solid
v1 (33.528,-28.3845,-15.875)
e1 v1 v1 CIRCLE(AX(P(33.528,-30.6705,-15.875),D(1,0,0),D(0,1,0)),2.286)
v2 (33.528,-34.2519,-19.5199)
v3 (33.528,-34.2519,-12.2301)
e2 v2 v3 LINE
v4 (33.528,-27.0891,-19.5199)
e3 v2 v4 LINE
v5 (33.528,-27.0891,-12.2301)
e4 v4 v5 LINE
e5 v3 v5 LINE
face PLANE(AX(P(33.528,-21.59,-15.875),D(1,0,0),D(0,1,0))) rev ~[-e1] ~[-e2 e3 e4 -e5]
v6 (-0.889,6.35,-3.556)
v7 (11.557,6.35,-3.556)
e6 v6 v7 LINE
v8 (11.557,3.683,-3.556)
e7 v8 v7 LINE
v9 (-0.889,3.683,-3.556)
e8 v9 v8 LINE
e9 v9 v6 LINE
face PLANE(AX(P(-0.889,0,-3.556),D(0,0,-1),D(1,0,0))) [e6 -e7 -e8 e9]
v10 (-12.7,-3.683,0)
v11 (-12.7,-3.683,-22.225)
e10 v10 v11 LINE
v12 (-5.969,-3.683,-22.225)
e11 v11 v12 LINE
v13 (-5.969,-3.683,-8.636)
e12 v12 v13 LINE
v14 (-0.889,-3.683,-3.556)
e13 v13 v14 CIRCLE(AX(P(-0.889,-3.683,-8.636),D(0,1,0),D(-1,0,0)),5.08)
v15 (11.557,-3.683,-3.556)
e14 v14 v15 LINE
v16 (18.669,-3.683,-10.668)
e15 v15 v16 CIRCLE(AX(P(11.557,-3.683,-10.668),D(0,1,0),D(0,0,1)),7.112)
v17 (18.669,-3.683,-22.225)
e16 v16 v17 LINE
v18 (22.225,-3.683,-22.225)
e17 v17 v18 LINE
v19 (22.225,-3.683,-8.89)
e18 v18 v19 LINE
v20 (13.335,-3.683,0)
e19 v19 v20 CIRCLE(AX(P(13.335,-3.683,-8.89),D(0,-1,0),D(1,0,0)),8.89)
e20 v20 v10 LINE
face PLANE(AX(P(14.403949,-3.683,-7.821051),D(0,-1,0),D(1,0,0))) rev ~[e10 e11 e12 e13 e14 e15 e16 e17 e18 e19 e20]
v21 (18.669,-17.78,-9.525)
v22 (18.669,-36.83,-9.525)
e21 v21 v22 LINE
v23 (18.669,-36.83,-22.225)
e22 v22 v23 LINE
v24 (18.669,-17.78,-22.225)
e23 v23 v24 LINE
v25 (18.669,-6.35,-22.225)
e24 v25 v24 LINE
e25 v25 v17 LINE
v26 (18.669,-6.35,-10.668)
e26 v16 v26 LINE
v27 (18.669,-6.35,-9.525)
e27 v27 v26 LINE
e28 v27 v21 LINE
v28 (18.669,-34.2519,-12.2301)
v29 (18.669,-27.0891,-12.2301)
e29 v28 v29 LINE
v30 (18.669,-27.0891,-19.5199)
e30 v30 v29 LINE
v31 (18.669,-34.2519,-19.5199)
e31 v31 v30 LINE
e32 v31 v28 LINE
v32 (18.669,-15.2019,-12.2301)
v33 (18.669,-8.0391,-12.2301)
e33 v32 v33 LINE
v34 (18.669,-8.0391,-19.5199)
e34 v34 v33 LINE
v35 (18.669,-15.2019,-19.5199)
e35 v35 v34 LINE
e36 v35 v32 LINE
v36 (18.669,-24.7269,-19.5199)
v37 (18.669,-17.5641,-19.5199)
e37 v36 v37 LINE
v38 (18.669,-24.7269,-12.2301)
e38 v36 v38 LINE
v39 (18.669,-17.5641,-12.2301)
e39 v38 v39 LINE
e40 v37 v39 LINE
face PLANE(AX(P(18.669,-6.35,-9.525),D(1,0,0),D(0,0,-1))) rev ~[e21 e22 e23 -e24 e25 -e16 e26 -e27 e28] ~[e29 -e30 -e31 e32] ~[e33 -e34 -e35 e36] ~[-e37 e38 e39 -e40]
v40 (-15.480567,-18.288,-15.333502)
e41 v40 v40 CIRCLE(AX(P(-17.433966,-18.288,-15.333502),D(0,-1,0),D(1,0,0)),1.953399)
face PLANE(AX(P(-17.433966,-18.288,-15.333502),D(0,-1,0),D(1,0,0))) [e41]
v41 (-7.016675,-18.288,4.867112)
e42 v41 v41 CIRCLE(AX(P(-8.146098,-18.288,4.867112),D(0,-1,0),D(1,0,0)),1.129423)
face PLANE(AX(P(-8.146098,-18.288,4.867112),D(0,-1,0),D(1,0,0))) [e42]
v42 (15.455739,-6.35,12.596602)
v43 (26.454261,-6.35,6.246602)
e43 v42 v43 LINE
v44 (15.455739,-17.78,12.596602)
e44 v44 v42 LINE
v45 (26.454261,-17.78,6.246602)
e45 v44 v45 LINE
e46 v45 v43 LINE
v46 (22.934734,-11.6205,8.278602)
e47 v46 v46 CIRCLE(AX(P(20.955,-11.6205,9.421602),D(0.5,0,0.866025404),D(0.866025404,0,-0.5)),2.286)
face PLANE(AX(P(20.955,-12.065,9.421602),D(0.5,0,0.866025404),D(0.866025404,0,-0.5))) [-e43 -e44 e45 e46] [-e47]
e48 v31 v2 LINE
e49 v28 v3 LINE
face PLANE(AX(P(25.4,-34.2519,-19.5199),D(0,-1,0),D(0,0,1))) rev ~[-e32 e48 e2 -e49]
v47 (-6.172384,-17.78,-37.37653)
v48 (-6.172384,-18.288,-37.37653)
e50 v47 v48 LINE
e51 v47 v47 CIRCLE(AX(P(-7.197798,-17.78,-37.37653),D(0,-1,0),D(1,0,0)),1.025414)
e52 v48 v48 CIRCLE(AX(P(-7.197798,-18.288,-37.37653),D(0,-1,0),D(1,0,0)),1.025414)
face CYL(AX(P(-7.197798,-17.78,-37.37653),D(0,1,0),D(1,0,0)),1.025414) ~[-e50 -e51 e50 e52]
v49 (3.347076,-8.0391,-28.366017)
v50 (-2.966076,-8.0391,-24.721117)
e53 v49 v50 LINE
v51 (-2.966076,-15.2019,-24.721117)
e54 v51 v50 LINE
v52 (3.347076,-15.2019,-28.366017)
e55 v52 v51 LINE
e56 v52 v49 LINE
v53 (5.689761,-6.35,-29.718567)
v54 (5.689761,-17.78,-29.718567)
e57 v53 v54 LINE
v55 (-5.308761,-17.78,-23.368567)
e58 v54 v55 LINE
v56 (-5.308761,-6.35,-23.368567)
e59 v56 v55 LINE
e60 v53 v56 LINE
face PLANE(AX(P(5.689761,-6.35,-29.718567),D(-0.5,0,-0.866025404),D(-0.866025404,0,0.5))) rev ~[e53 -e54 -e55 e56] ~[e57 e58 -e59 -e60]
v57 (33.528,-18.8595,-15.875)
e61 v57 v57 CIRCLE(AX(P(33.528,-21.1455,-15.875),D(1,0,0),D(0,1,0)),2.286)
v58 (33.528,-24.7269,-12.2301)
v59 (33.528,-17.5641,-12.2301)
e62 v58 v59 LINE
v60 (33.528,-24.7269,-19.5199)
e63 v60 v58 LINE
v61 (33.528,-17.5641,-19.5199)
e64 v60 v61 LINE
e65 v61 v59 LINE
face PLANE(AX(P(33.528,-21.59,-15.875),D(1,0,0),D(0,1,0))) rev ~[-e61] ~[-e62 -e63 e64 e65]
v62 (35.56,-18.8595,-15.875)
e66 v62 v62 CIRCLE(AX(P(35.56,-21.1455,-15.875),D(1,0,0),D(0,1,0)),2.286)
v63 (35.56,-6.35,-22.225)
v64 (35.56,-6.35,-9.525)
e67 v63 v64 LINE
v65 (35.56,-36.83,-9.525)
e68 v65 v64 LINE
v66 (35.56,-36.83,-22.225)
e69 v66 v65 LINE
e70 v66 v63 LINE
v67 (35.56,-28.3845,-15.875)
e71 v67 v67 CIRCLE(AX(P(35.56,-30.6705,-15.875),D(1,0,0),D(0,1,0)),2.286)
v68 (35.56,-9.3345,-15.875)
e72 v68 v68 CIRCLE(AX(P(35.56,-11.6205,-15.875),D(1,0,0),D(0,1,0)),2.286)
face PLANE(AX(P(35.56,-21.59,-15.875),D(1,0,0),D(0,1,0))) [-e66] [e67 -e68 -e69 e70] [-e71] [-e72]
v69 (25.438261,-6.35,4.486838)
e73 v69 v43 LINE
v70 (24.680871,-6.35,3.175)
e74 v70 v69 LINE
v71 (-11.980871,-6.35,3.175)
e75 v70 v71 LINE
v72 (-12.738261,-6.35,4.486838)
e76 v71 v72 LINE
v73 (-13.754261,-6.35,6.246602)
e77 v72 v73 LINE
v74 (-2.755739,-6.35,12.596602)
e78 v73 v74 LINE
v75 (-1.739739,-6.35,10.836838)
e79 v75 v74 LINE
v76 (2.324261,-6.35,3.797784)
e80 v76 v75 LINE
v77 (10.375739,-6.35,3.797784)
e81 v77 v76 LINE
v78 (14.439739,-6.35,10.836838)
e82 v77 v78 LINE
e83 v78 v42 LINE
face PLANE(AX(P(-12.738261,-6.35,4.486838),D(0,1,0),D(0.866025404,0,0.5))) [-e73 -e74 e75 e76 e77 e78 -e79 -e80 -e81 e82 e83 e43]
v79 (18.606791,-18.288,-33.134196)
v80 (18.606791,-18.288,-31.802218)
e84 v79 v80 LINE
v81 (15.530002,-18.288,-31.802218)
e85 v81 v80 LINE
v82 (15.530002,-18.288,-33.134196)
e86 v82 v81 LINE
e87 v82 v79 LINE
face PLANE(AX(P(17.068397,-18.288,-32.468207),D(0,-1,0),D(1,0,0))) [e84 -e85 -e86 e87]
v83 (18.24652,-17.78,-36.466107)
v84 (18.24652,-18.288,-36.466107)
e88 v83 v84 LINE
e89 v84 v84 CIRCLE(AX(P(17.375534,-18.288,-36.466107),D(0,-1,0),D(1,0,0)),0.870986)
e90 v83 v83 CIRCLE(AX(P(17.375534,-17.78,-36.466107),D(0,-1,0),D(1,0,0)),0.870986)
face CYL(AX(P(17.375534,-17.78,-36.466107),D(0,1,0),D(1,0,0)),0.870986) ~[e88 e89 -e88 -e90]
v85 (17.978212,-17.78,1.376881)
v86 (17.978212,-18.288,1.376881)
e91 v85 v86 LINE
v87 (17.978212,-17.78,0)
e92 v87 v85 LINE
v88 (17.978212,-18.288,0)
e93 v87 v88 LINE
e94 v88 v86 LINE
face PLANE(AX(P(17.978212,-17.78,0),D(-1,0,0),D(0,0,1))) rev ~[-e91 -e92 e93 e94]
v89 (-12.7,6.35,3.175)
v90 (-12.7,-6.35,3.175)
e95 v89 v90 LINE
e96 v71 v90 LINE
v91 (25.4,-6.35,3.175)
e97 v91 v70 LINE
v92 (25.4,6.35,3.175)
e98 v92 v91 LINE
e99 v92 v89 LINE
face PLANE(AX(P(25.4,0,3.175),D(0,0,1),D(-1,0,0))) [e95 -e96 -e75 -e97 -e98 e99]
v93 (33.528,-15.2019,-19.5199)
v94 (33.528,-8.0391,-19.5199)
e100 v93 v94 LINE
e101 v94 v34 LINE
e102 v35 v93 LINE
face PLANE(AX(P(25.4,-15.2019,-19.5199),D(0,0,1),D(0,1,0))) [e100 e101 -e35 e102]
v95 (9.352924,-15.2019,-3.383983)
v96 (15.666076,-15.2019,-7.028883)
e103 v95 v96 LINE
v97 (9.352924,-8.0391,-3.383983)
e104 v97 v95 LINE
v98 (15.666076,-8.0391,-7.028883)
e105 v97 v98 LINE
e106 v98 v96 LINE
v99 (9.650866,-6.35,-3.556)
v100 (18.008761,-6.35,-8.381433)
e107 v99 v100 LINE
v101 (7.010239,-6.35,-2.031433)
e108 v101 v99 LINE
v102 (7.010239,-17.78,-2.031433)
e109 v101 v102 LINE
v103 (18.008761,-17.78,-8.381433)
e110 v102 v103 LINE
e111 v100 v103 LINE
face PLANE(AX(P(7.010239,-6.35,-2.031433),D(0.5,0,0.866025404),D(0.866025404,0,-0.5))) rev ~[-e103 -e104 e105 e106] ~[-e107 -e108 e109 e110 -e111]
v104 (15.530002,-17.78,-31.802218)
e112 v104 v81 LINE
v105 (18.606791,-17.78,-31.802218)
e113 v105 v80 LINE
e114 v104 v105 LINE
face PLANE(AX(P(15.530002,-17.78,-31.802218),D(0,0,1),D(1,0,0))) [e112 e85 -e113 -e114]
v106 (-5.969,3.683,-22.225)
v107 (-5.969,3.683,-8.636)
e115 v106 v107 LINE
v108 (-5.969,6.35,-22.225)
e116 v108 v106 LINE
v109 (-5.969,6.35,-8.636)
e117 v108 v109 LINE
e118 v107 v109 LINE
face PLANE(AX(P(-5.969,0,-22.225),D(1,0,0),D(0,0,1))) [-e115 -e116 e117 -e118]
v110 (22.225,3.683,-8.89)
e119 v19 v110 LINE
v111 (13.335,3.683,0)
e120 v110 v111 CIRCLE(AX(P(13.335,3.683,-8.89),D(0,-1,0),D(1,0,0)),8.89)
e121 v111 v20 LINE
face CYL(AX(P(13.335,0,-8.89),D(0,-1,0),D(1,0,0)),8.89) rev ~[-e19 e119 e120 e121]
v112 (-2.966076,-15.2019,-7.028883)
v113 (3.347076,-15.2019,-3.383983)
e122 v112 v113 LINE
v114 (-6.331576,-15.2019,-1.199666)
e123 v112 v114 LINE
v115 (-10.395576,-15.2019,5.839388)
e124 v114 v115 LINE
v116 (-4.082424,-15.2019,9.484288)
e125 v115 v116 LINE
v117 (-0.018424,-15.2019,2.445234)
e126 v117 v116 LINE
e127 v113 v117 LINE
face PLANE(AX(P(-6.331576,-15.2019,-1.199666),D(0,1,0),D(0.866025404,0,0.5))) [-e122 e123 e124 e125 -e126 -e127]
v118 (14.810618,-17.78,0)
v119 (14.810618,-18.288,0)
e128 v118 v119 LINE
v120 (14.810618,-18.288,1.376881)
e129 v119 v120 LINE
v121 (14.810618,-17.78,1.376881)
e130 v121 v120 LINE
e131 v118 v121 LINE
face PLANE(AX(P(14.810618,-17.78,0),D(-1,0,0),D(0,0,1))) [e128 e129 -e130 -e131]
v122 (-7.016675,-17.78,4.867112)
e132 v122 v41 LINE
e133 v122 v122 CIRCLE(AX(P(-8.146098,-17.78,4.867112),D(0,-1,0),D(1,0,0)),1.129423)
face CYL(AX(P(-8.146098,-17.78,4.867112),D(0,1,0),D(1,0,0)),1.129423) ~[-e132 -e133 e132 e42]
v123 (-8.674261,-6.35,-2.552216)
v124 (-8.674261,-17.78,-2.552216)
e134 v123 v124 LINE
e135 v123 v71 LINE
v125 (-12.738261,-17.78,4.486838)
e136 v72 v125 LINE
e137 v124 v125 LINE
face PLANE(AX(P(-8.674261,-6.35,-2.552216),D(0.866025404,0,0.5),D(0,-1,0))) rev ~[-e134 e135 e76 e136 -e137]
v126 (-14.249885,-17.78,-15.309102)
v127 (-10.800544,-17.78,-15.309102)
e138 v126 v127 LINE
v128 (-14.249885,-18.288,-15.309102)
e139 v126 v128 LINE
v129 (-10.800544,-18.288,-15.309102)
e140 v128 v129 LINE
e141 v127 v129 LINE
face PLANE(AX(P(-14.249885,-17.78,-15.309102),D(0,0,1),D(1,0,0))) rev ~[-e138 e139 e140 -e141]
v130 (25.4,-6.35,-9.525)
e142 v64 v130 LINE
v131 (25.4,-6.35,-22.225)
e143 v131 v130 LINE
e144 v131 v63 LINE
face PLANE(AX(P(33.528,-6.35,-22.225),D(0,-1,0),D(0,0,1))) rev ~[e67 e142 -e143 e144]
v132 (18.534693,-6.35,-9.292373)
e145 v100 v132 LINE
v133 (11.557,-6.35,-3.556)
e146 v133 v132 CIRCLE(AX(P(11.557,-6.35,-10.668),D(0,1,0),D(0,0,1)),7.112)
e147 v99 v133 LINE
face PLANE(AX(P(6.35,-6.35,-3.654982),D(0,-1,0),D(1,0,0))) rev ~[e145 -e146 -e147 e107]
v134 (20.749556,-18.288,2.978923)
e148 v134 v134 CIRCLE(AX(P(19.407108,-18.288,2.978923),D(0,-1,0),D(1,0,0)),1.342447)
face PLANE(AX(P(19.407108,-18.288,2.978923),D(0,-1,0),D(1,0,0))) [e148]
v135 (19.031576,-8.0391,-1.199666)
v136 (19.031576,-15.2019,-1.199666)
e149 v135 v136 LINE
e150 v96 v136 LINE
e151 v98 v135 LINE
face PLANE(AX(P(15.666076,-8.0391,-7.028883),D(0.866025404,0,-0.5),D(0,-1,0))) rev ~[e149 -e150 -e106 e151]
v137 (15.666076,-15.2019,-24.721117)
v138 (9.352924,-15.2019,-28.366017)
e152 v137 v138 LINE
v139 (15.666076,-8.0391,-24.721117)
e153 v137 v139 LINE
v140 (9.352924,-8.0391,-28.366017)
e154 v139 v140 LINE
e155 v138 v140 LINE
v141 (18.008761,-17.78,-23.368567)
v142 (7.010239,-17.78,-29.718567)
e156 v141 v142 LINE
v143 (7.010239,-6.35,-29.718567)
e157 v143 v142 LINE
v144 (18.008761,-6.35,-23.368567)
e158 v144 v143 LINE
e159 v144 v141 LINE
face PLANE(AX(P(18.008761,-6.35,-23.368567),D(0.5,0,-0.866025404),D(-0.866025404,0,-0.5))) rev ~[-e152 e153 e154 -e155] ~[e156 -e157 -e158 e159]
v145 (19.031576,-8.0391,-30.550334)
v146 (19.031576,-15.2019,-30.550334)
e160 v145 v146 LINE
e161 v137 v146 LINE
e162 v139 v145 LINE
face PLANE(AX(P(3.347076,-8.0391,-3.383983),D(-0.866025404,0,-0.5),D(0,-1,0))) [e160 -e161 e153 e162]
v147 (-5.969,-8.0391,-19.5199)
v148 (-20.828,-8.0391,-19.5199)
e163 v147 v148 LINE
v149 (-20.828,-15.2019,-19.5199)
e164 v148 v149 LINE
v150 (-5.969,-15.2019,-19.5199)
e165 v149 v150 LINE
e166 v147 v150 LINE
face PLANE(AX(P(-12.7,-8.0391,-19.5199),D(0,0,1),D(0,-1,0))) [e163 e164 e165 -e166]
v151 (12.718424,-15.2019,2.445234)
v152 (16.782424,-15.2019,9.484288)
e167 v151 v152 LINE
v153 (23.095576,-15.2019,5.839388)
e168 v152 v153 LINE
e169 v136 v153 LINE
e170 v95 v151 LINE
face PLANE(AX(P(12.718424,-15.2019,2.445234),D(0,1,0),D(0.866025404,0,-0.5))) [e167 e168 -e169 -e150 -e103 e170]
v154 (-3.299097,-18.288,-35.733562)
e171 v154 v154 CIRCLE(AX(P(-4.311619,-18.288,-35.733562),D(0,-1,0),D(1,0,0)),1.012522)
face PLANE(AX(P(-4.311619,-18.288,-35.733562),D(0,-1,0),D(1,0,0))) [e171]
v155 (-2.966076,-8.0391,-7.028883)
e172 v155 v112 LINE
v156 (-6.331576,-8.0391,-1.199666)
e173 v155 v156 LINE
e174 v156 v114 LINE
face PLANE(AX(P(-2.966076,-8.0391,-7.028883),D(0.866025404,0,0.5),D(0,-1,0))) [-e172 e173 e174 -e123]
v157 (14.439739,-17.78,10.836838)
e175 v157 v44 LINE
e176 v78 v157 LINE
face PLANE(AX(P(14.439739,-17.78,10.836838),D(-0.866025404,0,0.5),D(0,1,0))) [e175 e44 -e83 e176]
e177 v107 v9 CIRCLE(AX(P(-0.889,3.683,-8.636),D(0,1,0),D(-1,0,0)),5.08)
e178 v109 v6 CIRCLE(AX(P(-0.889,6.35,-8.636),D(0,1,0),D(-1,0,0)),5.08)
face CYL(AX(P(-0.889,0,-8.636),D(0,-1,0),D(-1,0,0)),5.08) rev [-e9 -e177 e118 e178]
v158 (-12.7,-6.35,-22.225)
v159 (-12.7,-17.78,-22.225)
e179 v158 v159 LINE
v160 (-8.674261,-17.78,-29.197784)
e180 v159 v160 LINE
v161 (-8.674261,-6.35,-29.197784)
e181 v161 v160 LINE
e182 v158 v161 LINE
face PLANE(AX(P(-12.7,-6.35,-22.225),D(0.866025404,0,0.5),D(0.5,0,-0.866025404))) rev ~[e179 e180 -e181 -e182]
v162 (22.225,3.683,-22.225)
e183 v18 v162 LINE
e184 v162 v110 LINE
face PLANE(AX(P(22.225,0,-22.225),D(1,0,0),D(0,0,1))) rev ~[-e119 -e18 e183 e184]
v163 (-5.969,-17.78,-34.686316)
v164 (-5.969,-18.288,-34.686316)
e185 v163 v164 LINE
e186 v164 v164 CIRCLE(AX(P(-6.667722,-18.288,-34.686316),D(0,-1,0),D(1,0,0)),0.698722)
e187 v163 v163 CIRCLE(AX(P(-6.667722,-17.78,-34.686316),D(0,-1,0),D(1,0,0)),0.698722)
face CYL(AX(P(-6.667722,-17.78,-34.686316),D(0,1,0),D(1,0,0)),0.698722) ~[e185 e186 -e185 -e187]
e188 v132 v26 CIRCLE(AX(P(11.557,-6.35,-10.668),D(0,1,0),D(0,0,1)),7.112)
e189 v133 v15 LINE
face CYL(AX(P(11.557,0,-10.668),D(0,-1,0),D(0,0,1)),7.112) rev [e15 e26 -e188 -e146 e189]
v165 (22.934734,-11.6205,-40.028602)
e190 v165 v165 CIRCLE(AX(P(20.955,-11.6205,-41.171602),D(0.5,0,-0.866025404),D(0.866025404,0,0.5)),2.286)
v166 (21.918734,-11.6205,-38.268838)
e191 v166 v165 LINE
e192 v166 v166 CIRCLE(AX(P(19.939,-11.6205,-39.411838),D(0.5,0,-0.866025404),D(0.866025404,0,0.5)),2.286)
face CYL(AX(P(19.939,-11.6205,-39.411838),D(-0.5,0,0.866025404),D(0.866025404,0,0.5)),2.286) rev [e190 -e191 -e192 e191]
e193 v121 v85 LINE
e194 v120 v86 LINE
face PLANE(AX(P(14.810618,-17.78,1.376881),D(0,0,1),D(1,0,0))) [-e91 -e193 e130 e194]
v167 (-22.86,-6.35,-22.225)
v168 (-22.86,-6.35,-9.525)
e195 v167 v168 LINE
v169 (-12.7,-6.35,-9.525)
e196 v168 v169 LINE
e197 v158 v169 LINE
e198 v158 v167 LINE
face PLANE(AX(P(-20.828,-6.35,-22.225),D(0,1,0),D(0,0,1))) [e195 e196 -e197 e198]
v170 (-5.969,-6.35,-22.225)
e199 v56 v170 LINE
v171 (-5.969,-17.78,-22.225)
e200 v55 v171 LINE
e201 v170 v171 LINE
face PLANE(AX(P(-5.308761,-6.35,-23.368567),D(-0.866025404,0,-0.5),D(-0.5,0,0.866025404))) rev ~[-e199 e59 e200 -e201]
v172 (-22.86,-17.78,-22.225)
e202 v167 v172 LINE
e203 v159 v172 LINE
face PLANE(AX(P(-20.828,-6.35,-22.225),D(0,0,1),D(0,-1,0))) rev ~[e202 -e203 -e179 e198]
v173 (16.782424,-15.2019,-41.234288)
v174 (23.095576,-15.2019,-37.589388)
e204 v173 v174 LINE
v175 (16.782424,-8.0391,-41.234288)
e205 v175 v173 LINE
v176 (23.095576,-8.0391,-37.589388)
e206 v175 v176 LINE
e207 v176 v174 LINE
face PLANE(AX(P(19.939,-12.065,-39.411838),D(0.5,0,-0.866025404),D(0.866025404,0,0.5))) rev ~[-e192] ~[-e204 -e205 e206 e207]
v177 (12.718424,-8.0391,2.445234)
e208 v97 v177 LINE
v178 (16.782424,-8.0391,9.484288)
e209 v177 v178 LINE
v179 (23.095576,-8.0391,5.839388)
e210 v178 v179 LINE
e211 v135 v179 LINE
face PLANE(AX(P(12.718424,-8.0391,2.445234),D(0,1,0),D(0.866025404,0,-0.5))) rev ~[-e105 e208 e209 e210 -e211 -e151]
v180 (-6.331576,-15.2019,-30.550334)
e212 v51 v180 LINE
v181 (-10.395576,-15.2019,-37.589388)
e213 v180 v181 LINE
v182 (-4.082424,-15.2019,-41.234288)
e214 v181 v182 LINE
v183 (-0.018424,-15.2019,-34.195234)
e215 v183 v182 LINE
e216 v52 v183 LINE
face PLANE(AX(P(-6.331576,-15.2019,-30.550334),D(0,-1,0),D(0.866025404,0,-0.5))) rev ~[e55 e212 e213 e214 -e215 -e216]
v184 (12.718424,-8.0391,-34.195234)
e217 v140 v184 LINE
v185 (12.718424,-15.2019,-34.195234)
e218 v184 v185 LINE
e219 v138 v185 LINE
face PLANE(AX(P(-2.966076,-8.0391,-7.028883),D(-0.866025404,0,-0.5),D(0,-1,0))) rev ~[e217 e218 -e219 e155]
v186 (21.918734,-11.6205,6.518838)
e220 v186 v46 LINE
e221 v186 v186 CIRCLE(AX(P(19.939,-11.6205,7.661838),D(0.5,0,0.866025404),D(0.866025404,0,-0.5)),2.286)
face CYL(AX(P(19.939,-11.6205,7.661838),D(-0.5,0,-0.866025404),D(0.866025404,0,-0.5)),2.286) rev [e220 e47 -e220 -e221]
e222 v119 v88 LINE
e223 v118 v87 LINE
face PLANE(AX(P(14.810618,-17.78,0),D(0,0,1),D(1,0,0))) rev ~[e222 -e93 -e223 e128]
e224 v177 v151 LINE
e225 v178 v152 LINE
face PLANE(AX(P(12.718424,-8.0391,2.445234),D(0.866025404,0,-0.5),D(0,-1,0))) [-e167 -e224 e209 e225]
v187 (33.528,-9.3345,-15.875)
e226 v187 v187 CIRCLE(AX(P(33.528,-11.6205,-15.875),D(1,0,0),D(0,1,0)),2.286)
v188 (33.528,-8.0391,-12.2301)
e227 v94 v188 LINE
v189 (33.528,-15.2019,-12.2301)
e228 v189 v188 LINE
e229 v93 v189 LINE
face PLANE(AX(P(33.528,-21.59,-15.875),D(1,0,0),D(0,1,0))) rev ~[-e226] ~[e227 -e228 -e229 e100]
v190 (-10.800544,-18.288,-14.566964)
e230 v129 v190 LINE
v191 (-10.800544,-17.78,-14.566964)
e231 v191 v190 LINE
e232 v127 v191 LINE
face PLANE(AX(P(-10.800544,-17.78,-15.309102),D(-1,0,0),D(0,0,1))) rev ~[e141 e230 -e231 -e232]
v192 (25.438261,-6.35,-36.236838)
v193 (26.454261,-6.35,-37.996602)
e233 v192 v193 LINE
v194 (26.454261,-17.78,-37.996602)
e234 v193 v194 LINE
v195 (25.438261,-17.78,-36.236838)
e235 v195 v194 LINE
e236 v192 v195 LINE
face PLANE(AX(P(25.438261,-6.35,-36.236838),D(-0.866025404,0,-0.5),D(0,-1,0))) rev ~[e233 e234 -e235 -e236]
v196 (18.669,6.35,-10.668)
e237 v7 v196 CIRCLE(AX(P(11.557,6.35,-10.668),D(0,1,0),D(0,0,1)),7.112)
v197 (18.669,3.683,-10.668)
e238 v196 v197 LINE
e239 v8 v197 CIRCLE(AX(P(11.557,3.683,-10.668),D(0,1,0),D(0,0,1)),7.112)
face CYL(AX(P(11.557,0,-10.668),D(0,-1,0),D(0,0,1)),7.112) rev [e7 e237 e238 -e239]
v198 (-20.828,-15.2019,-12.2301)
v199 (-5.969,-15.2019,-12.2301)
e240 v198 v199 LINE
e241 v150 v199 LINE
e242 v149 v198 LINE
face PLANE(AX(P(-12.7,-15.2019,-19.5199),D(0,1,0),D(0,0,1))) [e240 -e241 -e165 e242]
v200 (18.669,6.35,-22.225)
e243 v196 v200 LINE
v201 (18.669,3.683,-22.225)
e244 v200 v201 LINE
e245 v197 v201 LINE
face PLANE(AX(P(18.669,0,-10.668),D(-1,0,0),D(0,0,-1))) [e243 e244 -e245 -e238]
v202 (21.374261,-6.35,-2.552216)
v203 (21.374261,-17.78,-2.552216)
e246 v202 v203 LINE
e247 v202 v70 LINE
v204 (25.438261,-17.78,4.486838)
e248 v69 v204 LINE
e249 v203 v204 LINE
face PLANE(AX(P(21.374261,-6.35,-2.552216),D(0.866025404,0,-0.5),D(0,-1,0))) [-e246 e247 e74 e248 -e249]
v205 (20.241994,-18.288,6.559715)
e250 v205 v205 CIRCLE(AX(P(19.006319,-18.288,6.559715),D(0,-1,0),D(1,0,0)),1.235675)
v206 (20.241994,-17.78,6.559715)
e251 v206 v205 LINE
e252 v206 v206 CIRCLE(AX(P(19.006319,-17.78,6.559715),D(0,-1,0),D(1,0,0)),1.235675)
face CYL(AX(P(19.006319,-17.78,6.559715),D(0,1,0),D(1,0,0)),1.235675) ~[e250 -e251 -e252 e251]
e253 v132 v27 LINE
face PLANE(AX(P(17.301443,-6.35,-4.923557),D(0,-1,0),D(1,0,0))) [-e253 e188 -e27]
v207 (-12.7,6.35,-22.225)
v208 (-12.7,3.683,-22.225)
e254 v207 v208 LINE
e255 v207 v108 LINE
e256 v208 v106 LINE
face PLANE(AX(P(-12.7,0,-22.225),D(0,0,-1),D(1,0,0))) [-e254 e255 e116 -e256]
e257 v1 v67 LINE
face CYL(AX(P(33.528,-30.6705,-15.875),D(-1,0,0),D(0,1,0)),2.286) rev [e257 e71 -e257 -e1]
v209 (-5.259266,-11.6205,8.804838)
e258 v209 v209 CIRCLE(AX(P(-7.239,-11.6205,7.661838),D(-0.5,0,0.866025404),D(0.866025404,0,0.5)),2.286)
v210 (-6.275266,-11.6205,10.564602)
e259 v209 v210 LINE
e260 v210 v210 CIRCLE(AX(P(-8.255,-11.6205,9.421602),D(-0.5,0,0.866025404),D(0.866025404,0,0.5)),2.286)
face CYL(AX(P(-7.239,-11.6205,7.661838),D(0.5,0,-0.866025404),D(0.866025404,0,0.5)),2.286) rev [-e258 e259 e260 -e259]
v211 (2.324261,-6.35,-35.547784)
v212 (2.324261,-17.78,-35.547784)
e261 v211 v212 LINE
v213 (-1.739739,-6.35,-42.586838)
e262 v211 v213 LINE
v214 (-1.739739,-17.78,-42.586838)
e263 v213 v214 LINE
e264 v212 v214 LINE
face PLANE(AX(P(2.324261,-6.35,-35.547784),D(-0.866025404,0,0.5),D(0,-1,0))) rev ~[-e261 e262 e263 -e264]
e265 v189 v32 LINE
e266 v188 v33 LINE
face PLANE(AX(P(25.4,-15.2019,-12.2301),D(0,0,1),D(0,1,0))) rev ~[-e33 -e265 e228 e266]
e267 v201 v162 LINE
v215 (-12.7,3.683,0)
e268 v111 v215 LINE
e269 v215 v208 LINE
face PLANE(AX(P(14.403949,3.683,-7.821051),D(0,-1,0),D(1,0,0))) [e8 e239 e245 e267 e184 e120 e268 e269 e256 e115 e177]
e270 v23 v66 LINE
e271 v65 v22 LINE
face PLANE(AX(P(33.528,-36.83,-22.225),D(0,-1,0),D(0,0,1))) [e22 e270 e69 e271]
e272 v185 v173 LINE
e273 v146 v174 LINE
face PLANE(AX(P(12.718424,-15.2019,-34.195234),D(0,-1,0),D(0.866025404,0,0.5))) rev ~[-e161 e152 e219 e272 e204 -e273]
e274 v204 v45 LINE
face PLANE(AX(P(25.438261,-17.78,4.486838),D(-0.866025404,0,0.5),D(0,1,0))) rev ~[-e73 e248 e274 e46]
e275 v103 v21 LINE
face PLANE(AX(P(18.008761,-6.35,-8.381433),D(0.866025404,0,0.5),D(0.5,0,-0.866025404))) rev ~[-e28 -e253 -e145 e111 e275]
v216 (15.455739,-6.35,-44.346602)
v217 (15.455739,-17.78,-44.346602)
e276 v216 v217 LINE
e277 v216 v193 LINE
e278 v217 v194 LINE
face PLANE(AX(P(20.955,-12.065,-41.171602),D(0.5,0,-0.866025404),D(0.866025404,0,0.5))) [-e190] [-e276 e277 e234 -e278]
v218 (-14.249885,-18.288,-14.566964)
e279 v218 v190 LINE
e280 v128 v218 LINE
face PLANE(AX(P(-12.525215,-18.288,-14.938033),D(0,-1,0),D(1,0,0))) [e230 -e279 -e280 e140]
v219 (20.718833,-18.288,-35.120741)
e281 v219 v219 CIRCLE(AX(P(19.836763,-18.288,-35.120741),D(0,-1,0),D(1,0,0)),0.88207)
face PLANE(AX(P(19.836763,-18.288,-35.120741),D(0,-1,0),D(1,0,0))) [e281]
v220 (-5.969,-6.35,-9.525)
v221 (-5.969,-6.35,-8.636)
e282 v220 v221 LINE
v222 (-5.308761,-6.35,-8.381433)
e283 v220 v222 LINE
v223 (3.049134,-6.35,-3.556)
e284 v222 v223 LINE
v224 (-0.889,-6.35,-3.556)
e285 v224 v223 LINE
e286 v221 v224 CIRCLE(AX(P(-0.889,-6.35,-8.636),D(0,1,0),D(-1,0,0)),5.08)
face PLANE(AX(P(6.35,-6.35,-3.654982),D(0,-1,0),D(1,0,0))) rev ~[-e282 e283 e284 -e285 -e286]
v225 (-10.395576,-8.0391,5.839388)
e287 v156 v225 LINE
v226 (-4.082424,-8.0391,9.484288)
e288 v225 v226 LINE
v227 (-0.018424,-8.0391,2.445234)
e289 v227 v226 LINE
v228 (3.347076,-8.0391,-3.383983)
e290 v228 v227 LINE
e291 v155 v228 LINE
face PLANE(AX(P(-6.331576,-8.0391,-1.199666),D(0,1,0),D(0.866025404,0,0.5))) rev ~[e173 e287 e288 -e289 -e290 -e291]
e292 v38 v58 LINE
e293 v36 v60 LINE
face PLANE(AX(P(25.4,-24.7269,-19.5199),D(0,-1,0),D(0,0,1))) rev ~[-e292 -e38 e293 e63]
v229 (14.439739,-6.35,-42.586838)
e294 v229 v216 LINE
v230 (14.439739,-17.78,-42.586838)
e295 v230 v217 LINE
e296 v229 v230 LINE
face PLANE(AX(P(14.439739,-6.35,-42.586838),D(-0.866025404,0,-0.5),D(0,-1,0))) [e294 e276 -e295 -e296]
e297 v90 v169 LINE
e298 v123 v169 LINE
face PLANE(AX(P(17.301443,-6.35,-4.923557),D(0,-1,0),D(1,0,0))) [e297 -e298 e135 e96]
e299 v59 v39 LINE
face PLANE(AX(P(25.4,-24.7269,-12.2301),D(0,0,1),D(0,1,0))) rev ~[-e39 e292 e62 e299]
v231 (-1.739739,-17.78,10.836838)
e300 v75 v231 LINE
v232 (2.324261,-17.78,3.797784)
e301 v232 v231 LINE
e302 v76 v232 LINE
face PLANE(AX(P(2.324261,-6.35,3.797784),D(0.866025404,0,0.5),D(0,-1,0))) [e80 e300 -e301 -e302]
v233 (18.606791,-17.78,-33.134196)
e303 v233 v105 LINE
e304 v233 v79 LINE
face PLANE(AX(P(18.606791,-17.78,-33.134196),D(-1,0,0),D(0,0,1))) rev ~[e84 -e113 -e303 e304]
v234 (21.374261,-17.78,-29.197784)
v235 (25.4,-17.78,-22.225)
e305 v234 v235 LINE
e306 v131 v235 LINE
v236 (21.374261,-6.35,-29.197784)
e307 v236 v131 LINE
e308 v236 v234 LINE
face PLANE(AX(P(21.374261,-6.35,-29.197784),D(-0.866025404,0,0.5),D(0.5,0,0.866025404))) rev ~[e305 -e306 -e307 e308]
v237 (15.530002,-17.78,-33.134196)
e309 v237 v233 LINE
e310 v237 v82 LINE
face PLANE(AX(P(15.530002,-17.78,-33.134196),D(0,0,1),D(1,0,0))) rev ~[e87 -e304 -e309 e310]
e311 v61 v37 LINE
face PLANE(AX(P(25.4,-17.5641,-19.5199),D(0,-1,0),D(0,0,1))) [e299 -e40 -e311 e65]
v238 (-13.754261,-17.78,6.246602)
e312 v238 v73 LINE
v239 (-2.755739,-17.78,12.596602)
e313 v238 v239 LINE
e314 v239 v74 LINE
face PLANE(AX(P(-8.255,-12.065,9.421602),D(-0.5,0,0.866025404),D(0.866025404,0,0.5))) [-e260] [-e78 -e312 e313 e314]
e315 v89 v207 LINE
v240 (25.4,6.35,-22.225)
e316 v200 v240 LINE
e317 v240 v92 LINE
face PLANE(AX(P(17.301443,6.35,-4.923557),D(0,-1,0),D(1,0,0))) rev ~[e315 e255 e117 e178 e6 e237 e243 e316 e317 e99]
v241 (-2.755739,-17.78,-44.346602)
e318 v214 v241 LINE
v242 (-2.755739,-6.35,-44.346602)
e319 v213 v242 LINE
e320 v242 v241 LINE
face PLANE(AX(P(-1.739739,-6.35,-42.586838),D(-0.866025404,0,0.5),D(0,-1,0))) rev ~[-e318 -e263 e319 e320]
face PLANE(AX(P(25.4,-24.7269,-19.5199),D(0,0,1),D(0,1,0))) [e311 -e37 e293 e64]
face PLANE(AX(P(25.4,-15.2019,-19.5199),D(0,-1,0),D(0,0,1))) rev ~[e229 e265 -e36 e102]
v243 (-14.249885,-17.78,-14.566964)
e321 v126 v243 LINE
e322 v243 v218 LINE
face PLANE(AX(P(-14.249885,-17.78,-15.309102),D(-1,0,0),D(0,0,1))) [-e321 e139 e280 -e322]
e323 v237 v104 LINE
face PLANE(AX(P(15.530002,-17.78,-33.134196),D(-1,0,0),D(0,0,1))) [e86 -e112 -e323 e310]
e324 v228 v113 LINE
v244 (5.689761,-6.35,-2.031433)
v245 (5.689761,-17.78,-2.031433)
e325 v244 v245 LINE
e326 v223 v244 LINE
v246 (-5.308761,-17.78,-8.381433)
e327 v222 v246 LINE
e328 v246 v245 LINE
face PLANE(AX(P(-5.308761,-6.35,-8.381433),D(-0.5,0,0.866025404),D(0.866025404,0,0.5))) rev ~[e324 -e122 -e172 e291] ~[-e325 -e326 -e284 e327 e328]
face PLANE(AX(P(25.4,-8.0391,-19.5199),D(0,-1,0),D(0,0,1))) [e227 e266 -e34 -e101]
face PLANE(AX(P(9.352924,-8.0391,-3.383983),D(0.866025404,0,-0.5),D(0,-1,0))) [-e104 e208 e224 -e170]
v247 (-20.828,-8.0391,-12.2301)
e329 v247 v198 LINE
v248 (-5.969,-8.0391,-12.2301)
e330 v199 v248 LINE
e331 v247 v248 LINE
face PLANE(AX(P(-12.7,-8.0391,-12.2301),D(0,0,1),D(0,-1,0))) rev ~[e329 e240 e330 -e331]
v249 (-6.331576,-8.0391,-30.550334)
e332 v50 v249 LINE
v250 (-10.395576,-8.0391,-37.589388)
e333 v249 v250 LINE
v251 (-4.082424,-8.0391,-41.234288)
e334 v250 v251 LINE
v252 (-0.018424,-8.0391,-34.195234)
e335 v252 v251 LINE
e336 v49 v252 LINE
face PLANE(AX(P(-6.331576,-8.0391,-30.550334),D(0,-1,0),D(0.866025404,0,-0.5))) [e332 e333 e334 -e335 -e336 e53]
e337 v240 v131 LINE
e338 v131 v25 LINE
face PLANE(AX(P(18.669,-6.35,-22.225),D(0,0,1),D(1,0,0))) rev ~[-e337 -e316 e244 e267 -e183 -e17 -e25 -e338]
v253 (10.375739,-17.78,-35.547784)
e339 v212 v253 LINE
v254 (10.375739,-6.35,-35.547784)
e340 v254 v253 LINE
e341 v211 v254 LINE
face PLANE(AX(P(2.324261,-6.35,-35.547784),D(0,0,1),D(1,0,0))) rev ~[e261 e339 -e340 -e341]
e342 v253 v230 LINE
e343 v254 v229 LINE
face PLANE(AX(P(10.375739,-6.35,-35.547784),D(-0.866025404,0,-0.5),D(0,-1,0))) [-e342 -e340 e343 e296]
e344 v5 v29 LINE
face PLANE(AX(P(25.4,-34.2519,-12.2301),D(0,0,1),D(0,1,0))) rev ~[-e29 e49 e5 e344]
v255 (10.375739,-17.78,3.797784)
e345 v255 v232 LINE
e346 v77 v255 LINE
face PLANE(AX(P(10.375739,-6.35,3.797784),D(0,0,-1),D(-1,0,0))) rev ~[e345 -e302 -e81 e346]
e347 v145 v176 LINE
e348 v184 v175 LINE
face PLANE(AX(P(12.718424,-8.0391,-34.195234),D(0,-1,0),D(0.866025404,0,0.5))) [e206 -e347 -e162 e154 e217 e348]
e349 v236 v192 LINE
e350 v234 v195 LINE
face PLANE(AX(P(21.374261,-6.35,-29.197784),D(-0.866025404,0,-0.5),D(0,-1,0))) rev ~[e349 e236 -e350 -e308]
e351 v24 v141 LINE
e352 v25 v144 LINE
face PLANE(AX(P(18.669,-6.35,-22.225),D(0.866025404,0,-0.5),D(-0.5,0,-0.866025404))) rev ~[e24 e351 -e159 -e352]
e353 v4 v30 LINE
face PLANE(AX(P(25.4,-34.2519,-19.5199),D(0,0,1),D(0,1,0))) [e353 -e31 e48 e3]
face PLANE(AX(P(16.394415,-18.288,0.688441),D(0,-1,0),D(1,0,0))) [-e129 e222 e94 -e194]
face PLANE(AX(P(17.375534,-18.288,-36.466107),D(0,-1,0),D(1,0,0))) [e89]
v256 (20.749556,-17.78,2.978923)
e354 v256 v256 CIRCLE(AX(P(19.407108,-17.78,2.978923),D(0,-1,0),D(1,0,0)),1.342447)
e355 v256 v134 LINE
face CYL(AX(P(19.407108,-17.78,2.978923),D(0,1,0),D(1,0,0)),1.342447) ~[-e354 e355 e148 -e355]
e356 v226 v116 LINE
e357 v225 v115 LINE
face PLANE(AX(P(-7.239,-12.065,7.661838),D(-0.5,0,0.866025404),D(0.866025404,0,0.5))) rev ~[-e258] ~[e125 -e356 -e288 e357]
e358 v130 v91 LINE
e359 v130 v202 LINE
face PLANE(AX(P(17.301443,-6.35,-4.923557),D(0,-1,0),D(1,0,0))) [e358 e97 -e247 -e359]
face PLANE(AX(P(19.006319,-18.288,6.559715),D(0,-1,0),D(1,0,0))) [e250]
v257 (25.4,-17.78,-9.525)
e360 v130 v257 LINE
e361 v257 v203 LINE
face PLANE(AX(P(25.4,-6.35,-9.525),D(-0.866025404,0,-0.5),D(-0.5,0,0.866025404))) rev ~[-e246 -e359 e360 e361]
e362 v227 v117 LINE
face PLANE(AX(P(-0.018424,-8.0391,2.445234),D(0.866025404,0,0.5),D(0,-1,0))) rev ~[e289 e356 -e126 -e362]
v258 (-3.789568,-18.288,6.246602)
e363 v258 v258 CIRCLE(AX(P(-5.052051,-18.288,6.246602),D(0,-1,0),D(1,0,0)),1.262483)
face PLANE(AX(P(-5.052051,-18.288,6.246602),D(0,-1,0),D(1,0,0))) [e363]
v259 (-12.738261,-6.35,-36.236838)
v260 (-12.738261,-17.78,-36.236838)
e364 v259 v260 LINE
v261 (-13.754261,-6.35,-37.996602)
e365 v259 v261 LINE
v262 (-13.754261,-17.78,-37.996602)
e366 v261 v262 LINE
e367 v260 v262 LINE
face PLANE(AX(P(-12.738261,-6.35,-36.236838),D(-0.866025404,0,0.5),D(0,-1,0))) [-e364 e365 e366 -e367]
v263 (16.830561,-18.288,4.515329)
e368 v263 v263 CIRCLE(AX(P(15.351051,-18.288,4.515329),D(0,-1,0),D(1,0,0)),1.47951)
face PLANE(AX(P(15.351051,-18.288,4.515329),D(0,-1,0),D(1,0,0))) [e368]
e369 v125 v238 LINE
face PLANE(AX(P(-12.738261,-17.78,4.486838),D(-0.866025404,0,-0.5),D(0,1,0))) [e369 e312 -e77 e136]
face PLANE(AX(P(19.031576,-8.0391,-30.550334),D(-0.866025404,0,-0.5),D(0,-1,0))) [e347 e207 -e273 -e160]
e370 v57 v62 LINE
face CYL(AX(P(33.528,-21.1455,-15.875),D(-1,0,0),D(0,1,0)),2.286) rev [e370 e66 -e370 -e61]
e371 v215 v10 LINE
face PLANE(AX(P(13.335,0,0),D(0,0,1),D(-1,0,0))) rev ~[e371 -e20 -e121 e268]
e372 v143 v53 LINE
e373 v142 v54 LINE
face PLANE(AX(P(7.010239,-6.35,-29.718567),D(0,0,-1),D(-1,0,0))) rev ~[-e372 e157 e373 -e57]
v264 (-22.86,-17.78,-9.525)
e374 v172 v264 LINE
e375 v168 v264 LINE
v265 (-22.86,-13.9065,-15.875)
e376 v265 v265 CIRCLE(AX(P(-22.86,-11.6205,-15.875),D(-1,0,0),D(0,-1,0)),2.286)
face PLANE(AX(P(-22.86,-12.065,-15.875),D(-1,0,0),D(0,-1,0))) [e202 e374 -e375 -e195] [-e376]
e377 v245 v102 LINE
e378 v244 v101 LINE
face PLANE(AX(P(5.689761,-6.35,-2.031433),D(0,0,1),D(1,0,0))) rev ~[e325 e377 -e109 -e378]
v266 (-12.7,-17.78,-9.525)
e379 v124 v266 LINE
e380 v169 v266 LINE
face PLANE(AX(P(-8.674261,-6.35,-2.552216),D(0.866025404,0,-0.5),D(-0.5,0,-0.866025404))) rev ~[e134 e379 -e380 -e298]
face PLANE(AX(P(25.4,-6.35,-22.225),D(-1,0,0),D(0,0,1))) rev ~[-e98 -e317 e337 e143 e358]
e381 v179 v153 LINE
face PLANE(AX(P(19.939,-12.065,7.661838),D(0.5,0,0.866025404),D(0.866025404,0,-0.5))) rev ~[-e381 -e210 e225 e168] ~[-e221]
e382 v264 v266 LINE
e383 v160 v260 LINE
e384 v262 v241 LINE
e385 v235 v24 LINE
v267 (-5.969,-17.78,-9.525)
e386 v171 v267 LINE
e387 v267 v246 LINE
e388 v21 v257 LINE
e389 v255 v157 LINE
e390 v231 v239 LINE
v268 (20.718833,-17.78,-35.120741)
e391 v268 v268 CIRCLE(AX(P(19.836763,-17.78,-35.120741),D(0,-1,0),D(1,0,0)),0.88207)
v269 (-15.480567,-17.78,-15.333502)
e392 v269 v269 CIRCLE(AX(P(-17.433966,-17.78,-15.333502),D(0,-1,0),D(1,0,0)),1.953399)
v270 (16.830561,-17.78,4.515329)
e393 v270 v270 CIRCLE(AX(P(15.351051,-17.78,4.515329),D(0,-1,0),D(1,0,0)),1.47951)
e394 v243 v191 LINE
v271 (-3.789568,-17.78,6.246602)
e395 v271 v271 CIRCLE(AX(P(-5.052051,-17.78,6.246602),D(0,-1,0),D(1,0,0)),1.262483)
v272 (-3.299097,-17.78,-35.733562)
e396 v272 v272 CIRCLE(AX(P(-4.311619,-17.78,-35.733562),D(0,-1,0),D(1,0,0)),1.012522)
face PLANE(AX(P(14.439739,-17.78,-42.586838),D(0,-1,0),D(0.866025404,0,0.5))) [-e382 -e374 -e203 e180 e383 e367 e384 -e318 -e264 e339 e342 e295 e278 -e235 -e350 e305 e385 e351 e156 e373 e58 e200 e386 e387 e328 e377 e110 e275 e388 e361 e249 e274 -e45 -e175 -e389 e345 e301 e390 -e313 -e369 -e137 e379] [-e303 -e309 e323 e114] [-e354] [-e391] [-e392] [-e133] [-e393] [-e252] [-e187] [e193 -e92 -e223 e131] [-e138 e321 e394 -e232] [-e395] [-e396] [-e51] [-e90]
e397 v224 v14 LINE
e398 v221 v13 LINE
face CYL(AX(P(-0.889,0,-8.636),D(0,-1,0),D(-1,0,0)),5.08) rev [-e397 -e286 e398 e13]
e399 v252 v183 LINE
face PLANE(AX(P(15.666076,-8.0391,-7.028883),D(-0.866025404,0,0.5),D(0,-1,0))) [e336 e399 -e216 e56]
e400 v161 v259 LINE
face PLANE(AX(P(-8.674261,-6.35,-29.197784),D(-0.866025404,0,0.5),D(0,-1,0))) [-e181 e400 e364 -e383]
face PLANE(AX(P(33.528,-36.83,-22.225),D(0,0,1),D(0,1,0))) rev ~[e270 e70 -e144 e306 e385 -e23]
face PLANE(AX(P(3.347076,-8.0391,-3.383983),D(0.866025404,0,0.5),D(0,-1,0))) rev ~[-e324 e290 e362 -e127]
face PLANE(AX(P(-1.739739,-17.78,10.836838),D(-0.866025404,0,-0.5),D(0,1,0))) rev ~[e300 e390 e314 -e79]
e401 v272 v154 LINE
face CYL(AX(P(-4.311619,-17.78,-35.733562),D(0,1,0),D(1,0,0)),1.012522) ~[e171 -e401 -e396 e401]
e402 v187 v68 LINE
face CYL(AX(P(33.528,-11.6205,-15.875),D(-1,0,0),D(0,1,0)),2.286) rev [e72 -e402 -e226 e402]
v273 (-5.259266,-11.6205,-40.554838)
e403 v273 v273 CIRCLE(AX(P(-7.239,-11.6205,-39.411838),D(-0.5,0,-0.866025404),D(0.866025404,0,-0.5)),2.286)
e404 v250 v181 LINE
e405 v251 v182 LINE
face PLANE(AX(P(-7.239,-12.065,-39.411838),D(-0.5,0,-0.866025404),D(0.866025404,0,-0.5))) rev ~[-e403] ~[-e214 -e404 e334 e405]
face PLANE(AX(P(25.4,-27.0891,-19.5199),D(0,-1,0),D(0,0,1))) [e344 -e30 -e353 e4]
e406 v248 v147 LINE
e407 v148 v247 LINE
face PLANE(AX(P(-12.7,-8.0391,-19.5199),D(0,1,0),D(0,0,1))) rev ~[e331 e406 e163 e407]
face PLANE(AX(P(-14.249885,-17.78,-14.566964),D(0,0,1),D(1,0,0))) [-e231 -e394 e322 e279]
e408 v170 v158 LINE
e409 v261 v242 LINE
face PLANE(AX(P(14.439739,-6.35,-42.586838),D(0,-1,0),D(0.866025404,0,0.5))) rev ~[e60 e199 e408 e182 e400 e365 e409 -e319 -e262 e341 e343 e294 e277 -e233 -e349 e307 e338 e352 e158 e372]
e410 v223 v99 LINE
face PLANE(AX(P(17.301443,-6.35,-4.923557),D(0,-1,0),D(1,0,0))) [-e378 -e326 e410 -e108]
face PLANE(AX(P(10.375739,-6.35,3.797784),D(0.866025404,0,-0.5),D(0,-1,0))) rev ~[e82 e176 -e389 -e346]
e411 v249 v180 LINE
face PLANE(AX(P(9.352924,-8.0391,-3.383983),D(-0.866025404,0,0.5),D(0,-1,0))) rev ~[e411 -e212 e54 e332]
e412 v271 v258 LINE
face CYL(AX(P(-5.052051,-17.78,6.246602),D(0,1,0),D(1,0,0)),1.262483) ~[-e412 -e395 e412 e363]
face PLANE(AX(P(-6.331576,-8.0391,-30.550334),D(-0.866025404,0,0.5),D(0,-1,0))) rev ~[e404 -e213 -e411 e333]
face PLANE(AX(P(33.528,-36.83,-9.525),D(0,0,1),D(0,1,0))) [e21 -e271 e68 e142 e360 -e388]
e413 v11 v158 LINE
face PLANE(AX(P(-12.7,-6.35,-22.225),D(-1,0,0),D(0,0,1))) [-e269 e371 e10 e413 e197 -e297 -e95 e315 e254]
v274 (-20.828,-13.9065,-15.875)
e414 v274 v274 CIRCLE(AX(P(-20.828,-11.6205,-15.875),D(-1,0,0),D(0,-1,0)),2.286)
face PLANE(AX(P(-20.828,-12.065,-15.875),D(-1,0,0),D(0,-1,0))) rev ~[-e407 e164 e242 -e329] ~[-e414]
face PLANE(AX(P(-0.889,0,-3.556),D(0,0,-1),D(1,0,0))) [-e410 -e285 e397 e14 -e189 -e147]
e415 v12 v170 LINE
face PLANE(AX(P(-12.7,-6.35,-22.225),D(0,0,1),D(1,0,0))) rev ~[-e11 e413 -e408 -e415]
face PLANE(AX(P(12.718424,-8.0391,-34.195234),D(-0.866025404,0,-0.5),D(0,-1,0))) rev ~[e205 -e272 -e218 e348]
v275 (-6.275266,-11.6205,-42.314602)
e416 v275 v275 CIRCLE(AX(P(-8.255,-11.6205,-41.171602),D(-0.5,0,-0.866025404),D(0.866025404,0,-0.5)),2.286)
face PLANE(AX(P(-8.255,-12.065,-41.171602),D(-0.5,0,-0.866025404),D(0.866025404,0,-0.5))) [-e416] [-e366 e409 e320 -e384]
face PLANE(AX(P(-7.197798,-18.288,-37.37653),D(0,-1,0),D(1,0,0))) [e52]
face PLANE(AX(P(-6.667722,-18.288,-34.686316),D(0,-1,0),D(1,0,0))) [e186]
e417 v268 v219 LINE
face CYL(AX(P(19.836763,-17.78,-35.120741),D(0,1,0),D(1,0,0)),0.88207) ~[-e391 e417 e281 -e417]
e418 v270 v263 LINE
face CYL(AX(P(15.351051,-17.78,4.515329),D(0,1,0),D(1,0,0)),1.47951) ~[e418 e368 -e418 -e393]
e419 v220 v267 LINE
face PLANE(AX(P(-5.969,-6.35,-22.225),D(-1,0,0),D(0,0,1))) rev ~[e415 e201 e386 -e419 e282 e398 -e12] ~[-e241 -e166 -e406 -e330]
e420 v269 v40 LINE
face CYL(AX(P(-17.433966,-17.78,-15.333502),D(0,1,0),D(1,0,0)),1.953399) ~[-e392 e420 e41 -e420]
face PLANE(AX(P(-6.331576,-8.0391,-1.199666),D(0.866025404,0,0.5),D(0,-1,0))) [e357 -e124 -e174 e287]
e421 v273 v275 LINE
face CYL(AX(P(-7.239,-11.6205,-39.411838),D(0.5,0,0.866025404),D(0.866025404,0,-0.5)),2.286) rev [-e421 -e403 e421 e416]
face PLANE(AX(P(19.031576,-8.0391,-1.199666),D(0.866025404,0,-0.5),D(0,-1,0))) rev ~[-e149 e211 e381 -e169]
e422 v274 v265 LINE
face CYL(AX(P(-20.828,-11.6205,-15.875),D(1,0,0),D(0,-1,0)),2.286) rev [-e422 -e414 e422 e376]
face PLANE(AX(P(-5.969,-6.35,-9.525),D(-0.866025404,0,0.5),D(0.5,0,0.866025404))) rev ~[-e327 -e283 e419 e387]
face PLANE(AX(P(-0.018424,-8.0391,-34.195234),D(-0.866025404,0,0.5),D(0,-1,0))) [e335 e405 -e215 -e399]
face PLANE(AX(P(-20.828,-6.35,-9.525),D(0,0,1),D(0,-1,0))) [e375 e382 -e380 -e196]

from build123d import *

# Parameters (mm, degrees)
F0_W           = 12.7
F0_H           = 3.175
F1_DEPTH       = 6.35
F2_DEPTH       = 3.683
F4_DEPTH       = 30.48
F5_W           = 7.1628
F5_H           = 7.2898
F6_DEPTH       = 38.101
F3_W           = 6.731
F3_H           = 12.7
F7_DEPTH       = 11.43
F8_W           = 3.5814
F8_H           = 3.6449
F9_DEPTH       = 12.7
F11_DEPTH      = 11.43
F12_W          = 7.2898
F12_H          = 7.1628
F13_DEPTH      = 6.731
F13_DEPTH_BACK = 31.369
F14_W          = 7.2898
F14_H          = 7.1628
F15_DEPTH      = 6.731
F15_DEPTH_BACK = 31.369
F16_W          = 7.1628
F16_H          = 7.2898
F17_DEPTH      = 8.128
F18_DEPTH      = 8.128
F19_DEPTH      = 8.128
F20_W          = 11.43
F20_H          = 12.7
F20_W_2        = 7.1628
F20_H_2        = 7.2898
F21_DEPTH      = 8.128
F22_DEPTH      = 8.128
F23_DEPTH      = 8.128
F24_W          = 12.7
F24_H          = 11.43
F24_R          = 2.286
F25_DEPTH      = 2.032
F26_W          = 12.7
F26_H          = 11.43
F26_R          = 2.286
F27_DEPTH      = 2.032
F28_W          = 11.43
F28_H          = 12.7
F28_R          = 2.286
F29_DEPTH      = 2.032
F30_W          = 12.7
F30_H          = 11.43
F30_R          = 2.286
F31_DEPTH      = 2.032
F32_W          = 12.7
F32_H          = 11.43
F32_R          = 2.286
F33_DEPTH      = 2.032
F34_W          = 30.48
F34_H          = 12.7
F34_R          = 2.286
F35_DEPTH      = 2.032
F36_R          = 1.9533985806
F36_R_2        = 1.1294229331
F36_R_3        = 1.2624825339
F36_R_4        = 1.2356748077
F36_R_5        = 1.4795101848
F36_R_6        = 1.3424473069
F36_R_7        = 0.8820699454
F36_R_8        = 0.8709860762
F36_R_9        = 1.0254141301
F36_R_10       = 0.6987220166
F36_R_11       = 1.012521994
F36_W          = 3.4493412822
F36_H          = 0.7421383634
F36_W_2        = 3.1675938517
F36_H_2        = 1.3768810313
F36_W_3        = 3.0767889693
F36_H_3        = 1.3319775462
F37_DEPTH      = 0.508


with BuildPart() as f1:
    # F0 (on Front) → F1 (new body, symmetric)
    with BuildSketch(Plane.XZ):
        with BuildLine():
            Line((0, 3.175), (0, 0))
            Line((0, 0), (13.335, 0))
            ThreePointArc((13.335, 0), (19.6211792847, -2.6038207153), (22.225, -8.89))
            Line((22.225, -8.89), (22.225, -22.225))
            Line((22.225, -22.225), (25.4, -22.225))
            Line((25.4, -22.225), (25.4, 3.175))
            Line((25.4, 3.175), (0, 3.175))
        make_face()
        with BuildLine():
            Line((13.335, 0), (0, 0))
            Line((0, 0), (0, -3.556))
            Line((0, -3.556), (11.557, -3.556))
            ThreePointArc((11.557, -3.556), (16.5859434278, -5.6390565722), (18.669, -10.668))
            Line((18.669, -10.668), (18.669, -22.225))
            Line((18.669, -22.225), (22.225, -22.225))
            Line((22.225, -22.225), (22.225, -8.89))
            ThreePointArc((22.225, -8.89), (19.6211792847, -2.6038207153), (13.335, 0))
        make_face()
        with Locations((-6.35, 1.5875)):
            Rectangle(F0_W, F0_H)
        with BuildLine():
            Line((0, -3.556), (0, 0))
            Line((0, 0), (-12.7, 0))
            Line((-12.7, 0), (-12.7, -22.225))
            Line((-12.7, -22.225), (-5.969, -22.225))
            Line((-5.969, -22.225), (-5.969, -8.636))
            ThreePointArc((-5.969, -8.636), (-4.4811024484, -5.0438975516), (-0.889, -3.556))
            Line((-0.889, -3.556), (0, -3.556))
        make_face()
    extrude(amount=F1_DEPTH, both=True)

    # F0 (on Front) → F2 (cut, symmetric)
    with BuildSketch(Plane.XZ):
        with BuildLine():
            Line((13.335, 0), (0, 0))
            Line((0, 0), (0, -3.556))
            Line((0, -3.556), (11.557, -3.556))
            ThreePointArc((11.557, -3.556), (16.5859434278, -5.6390565722), (18.669, -10.668))
            Line((18.669, -10.668), (18.669, -22.225))
            Line((18.669, -22.225), (22.225, -22.225))
            Line((22.225, -22.225), (22.225, -8.89))
            ThreePointArc((22.225, -8.89), (19.6211792847, -2.6038207153), (13.335, 0))
        make_face()
        with BuildLine():
            Line((0, -3.556), (0, 0))
            Line((0, 0), (-12.7, 0))
            Line((-12.7, 0), (-12.7, -22.225))
            Line((-12.7, -22.225), (-5.969, -22.225))
            Line((-5.969, -22.225), (-5.969, -8.636))
            ThreePointArc((-5.969, -8.636), (-4.4811024484, -5.0438975516), (-0.889, -3.556))
            Line((-0.889, -3.556), (0, -3.556))
        make_face()
    extrude(amount=F2_DEPTH, both=True, mode=Mode.SUBTRACT)

    # F3 (on face) → F4 (join)
    with BuildSketch(Plane.XZ.offset(6.35)):
        Polygon((18.669, -10.668), (18.669, -22.225), (25.4, -22.225), (25.4, -9.525), (18.669, -9.525), align=None)
    extrude(amount=F4_DEPTH)

    # F5 (on face) → F6 (cut, through all)
    with BuildSketch(Plane.YZ.offset(25.4)):
        with Locations((-11.6205, -15.875)):
            Rectangle(F5_W, F5_H)
        with Locations((-21.1455, -15.875)):
            Rectangle(F5_W, F5_H)
        with Locations((-30.6705, -15.875)):
            Rectangle(F5_W, F5_H)
    extrude(amount=-F6_DEPTH, mode=Mode.SUBTRACT)

    # F3 (on face) → F7 (join)
    with BuildSketch(Plane.XZ.offset(6.35)):
        with Locations((-9.3345, -15.875)):
            Rectangle(F3_W, F3_H)
    extrude(amount=F7_DEPTH)

    # F8 (on face) → F9 (cut)
    with BuildSketch(Plane(origin=(-12.7, 0, 0), x_dir=(0, -1, 0), z_dir=(-1, 0, 0))):
        with Locations((13.4112, -14.05255)):
            Rectangle(F8_W, F8_H)
        with Locations((9.8298, -14.05255)):
            Rectangle(F8_W, F8_H)
        Polygon((15.2019, -19.5199), (15.2019, -15.875), (11.6205, -15.875), (8.0391, -15.875), (8.0391, -19.5199), align=None)
    extrude(amount=-F9_DEPTH, mode=Mode.SUBTRACT)

    # F10 (on face) → F11 (join, through all)
    with BuildSketch(Plane.XZ.offset(6.35)):
        Polygon((-5.969, -9.525), (-5.308761314, -8.3814330508), (5.689761314, -2.0314330508), (7.010238686, -2.0314330508), (18.008761314, -8.3814330508), (18.669, -9.525), (25.4, -9.525), (21.374261314, -2.5522160579), (10.375738686, 3.7977839421), (2.324261314, 3.7977839421), (-8.674261314, -2.5522160579), (-12.7, -9.525), align=None)
        Polygon((18.008761314, -23.3685669492), (7.010238686, -29.7185669492), (5.689761314, -29.7185669492), (-5.308761314, -23.3685669492), (-5.969, -22.225), (-12.7, -22.225), (-8.674261314, -29.1977839421), (2.324261314, -35.5477839421), (10.375738686, -35.5477839421), (21.374261314, -29.1977839421), (25.4, -22.225), (18.669, -22.225), align=None)
    extrude(amount=F11_DEPTH)

    # F12 (on face) → F13 (cut, two sides)
    with BuildSketch(Plane(origin=(2.3020766425, 0, -3.9873137078), x_dir=(0.8660254038, 0, 0.5), z_dir=(0.5, 0, -0.8660254038))) as f13_sk:
        with Locations((-2.438238686, 11.6205)):
            Rectangle(F12_W, F12_H)
    extrude(amount=-F13_DEPTH, mode=Mode.SUBTRACT)
    extrude(f13_sk.sketch, amount=F13_DEPTH_BACK, mode=Mode.SUBTRACT)

    # F14 (on face) → F15 (cut, two sides)
    with BuildSketch(Plane(origin=(0.8729233575, 0, 1.5119476062), x_dir=(0.8660254038, 0, -0.5), z_dir=(-0.5, 0, -0.8660254038))) as f15_sk:
        with Locations((13.436761314, 11.6205)):
            Rectangle(F14_W, F14_H)
    extrude(amount=-F15_DEPTH, mode=Mode.SUBTRACT)
    extrude(f15_sk.sketch, amount=F15_DEPTH_BACK, mode=Mode.SUBTRACT)

    # F16 (on face) → F17 (join)
    with BuildSketch(Plane.YZ.offset(25.4)):
        Polygon((-17.78, -9.525), (-36.83, -9.525), (-36.83, -22.225), (-17.78, -22.225), (-6.35, -22.225), (-6.35, -9.525), align=None)
        with Locations((-30.6705, -15.875)):
            Rectangle(F16_W, F16_H, mode=Mode.SUBTRACT)
        with Locations((-21.1455, -15.875)):
            Rectangle(F16_W, F16_H, mode=Mode.SUBTRACT)
        with Locations((-11.6205, -15.875)):
            Rectangle(F16_W, F16_H, mode=Mode.SUBTRACT)
    extrude(amount=F17_DEPTH)

    # F18 (add): a face of the model
    f18_faces = [f1.faces().sort_by_distance(p)[0] for p in [
        (21.2262913255, -12.065, -2.4667855452),
    ]]
    extrude(f18_faces, amount=F18_DEPTH)

    # F19 (add): a face of the model
    f19_faces = [f1.faces().sort_by_distance(p)[0] for p in [
        (2.1762913255, -12.065, 3.7123534294),
    ]]
    extrude(f19_faces, amount=F19_DEPTH)

    # F20 (on face) → F21 (join)
    with BuildSketch(Plane(origin=(-12.7, 0, 0), x_dir=(0, -1, 0), z_dir=(-1, 0, 0))):
        with Locations((12.065, -15.875)):
            Rectangle(F20_W, F20_H)
        with Locations((11.6205, -15.875)):
            Rectangle(F20_W_2, F20_H_2, mode=Mode.SUBTRACT)
    extrude(amount=F21_DEPTH)

    # F22 (add): a face of the model
    f22_faces = [f1.faces().sort_by_distance(p)[0] for p in [
        (-8.5262913255, -12.065, -29.2832144548),
    ]]
    extrude(f22_faces, amount=F22_DEPTH)

    # F23 (add): a face of the model
    f23_faces = [f1.faces().sort_by_distance(p)[0] for p in [
        (10.5237086745, -12.065, -35.4623534294),
    ]]
    extrude(f23_faces, amount=F23_DEPTH)

    # F24 (on face) → F25 (join)
    with BuildSketch(Plane(origin=(8.3024233575, 0, 14.3802190811), x_dir=(0.8660254038, 0, -0.5), z_dir=(0.5, 0, 0.8660254038))):
        with Locations((13.436761314, -12.065)):
            Rectangle(F24_W, F24_H)
        with Locations((13.436761314, -11.6205)):
            Circle(F24_R, mode=Mode.SUBTRACT)
    extrude(amount=F25_DEPTH)

    # F26 (on face) → F27 (join)
    with BuildSketch(Plane(origin=(-5.1274233575, 0, 8.880957767), x_dir=(0.8660254038, 0, 0.5), z_dir=(-0.5, 0, 0.8660254038))):
        with Locations((-2.438238686, -12.065)):
            Rectangle(F26_W, F26_H)
        with Locations((-2.4382386859, -11.6205)):
            Circle(F26_R, mode=Mode.SUBTRACT)
    extrude(amount=F27_DEPTH)

    # F28 (on face) → F29 (join)
    with BuildSketch(Plane(origin=(-20.828, 0, 0), x_dir=(0, -1, 0), z_dir=(-1, 0, 0))):
        with Locations((12.065, -15.875)):
            Rectangle(F28_W, F28_H)
        with Locations((11.6205, -15.875)):
            Circle(F28_R, mode=Mode.SUBTRACT)
    extrude(amount=F29_DEPTH)

    # F30 (on face) → F31 (join)
    with BuildSketch(Plane(origin=(-18.8755766425, 0, -32.693457767), x_dir=(0.8660254038, 0, -0.5), z_dir=(-0.5, 0, -0.8660254038))):
        with Locations((13.436761314, 12.065)):
            Rectangle(F30_W, F30_H)
        with Locations((13.436761314, 11.6205)):
            Circle(F30_R, mode=Mode.SUBTRACT)
    extrude(amount=F31_DEPTH)

    # F32 (on face) → F33 (join)
    with BuildSketch(Plane(origin=(22.0505766425, 0, -38.1927190811), x_dir=(0.8660254038, 0, 0.5), z_dir=(0.5, 0, -0.8660254038))):
        with Locations((-2.438238686, 12.065)):
            Rectangle(F32_W, F32_H)
        with Locations((-2.4382386859, 11.6205)):
            Circle(F32_R, mode=Mode.SUBTRACT)
    extrude(amount=F33_DEPTH)

    # F34 (on face) → F35 (join)
    with BuildSketch(Plane.YZ.offset(33.528)):
        with Locations((-21.59, -15.875)):
            Rectangle(F34_W, F34_H)
        with Locations((-30.6705, -15.875)):
            Circle(F34_R, mode=Mode.SUBTRACT)
        with Locations((-21.1455, -15.875)):
            Circle(F34_R, mode=Mode.SUBTRACT)
        with Locations((-11.6205, -15.875)):
            Circle(F34_R, mode=Mode.SUBTRACT)
    extrude(amount=F35_DEPTH)

    # F36 (on face) → F37 (join)
    with BuildSketch(Plane.XZ.offset(17.78)):
        with Locations((-17.4339655787, -15.3335016221)):
            Circle(F36_R)
        with Locations((-8.1460978836, 4.867112264)):
            Circle(F36_R_2)
        with Locations((-5.0520505756, 6.2466020445)):
            Circle(F36_R_3)
        with Locations((19.006319344, 6.5597151406)):
            Circle(F36_R_4)
        with Locations((15.3510505334, 4.5153293759)):
            Circle(F36_R_5)
        with Locations((19.4071084261, 2.9789232649)):
            Circle(F36_R_6)
        with Locations((19.83676292, -35.1207405329)):
            Circle(F36_R_7)
        with Locations((17.3755344003, -36.4661067724)):
            Circle(F36_R_8)
        with Locations((-7.1977977641, -37.3765304685)):
            Circle(F36_R_9)
        with Locations((-6.6677220166, -34.6863158047)):
            Circle(F36_R_10)
        with Locations((-4.3116188608, -35.7335619628)):
            Circle(F36_R_11)
        with Locations((-12.5252148136, -14.9380327202)):
            Rectangle(F36_W, F36_H)
        with Locations((16.394414939, 0.6884405157)):
            Rectangle(F36_W_2, F36_H_2)
        with Locations((17.0683967881, -32.4682071805)):
            Rectangle(F36_W_3, F36_H_3)
    extrude(amount=F37_DEPTH)


solid = f1.part
